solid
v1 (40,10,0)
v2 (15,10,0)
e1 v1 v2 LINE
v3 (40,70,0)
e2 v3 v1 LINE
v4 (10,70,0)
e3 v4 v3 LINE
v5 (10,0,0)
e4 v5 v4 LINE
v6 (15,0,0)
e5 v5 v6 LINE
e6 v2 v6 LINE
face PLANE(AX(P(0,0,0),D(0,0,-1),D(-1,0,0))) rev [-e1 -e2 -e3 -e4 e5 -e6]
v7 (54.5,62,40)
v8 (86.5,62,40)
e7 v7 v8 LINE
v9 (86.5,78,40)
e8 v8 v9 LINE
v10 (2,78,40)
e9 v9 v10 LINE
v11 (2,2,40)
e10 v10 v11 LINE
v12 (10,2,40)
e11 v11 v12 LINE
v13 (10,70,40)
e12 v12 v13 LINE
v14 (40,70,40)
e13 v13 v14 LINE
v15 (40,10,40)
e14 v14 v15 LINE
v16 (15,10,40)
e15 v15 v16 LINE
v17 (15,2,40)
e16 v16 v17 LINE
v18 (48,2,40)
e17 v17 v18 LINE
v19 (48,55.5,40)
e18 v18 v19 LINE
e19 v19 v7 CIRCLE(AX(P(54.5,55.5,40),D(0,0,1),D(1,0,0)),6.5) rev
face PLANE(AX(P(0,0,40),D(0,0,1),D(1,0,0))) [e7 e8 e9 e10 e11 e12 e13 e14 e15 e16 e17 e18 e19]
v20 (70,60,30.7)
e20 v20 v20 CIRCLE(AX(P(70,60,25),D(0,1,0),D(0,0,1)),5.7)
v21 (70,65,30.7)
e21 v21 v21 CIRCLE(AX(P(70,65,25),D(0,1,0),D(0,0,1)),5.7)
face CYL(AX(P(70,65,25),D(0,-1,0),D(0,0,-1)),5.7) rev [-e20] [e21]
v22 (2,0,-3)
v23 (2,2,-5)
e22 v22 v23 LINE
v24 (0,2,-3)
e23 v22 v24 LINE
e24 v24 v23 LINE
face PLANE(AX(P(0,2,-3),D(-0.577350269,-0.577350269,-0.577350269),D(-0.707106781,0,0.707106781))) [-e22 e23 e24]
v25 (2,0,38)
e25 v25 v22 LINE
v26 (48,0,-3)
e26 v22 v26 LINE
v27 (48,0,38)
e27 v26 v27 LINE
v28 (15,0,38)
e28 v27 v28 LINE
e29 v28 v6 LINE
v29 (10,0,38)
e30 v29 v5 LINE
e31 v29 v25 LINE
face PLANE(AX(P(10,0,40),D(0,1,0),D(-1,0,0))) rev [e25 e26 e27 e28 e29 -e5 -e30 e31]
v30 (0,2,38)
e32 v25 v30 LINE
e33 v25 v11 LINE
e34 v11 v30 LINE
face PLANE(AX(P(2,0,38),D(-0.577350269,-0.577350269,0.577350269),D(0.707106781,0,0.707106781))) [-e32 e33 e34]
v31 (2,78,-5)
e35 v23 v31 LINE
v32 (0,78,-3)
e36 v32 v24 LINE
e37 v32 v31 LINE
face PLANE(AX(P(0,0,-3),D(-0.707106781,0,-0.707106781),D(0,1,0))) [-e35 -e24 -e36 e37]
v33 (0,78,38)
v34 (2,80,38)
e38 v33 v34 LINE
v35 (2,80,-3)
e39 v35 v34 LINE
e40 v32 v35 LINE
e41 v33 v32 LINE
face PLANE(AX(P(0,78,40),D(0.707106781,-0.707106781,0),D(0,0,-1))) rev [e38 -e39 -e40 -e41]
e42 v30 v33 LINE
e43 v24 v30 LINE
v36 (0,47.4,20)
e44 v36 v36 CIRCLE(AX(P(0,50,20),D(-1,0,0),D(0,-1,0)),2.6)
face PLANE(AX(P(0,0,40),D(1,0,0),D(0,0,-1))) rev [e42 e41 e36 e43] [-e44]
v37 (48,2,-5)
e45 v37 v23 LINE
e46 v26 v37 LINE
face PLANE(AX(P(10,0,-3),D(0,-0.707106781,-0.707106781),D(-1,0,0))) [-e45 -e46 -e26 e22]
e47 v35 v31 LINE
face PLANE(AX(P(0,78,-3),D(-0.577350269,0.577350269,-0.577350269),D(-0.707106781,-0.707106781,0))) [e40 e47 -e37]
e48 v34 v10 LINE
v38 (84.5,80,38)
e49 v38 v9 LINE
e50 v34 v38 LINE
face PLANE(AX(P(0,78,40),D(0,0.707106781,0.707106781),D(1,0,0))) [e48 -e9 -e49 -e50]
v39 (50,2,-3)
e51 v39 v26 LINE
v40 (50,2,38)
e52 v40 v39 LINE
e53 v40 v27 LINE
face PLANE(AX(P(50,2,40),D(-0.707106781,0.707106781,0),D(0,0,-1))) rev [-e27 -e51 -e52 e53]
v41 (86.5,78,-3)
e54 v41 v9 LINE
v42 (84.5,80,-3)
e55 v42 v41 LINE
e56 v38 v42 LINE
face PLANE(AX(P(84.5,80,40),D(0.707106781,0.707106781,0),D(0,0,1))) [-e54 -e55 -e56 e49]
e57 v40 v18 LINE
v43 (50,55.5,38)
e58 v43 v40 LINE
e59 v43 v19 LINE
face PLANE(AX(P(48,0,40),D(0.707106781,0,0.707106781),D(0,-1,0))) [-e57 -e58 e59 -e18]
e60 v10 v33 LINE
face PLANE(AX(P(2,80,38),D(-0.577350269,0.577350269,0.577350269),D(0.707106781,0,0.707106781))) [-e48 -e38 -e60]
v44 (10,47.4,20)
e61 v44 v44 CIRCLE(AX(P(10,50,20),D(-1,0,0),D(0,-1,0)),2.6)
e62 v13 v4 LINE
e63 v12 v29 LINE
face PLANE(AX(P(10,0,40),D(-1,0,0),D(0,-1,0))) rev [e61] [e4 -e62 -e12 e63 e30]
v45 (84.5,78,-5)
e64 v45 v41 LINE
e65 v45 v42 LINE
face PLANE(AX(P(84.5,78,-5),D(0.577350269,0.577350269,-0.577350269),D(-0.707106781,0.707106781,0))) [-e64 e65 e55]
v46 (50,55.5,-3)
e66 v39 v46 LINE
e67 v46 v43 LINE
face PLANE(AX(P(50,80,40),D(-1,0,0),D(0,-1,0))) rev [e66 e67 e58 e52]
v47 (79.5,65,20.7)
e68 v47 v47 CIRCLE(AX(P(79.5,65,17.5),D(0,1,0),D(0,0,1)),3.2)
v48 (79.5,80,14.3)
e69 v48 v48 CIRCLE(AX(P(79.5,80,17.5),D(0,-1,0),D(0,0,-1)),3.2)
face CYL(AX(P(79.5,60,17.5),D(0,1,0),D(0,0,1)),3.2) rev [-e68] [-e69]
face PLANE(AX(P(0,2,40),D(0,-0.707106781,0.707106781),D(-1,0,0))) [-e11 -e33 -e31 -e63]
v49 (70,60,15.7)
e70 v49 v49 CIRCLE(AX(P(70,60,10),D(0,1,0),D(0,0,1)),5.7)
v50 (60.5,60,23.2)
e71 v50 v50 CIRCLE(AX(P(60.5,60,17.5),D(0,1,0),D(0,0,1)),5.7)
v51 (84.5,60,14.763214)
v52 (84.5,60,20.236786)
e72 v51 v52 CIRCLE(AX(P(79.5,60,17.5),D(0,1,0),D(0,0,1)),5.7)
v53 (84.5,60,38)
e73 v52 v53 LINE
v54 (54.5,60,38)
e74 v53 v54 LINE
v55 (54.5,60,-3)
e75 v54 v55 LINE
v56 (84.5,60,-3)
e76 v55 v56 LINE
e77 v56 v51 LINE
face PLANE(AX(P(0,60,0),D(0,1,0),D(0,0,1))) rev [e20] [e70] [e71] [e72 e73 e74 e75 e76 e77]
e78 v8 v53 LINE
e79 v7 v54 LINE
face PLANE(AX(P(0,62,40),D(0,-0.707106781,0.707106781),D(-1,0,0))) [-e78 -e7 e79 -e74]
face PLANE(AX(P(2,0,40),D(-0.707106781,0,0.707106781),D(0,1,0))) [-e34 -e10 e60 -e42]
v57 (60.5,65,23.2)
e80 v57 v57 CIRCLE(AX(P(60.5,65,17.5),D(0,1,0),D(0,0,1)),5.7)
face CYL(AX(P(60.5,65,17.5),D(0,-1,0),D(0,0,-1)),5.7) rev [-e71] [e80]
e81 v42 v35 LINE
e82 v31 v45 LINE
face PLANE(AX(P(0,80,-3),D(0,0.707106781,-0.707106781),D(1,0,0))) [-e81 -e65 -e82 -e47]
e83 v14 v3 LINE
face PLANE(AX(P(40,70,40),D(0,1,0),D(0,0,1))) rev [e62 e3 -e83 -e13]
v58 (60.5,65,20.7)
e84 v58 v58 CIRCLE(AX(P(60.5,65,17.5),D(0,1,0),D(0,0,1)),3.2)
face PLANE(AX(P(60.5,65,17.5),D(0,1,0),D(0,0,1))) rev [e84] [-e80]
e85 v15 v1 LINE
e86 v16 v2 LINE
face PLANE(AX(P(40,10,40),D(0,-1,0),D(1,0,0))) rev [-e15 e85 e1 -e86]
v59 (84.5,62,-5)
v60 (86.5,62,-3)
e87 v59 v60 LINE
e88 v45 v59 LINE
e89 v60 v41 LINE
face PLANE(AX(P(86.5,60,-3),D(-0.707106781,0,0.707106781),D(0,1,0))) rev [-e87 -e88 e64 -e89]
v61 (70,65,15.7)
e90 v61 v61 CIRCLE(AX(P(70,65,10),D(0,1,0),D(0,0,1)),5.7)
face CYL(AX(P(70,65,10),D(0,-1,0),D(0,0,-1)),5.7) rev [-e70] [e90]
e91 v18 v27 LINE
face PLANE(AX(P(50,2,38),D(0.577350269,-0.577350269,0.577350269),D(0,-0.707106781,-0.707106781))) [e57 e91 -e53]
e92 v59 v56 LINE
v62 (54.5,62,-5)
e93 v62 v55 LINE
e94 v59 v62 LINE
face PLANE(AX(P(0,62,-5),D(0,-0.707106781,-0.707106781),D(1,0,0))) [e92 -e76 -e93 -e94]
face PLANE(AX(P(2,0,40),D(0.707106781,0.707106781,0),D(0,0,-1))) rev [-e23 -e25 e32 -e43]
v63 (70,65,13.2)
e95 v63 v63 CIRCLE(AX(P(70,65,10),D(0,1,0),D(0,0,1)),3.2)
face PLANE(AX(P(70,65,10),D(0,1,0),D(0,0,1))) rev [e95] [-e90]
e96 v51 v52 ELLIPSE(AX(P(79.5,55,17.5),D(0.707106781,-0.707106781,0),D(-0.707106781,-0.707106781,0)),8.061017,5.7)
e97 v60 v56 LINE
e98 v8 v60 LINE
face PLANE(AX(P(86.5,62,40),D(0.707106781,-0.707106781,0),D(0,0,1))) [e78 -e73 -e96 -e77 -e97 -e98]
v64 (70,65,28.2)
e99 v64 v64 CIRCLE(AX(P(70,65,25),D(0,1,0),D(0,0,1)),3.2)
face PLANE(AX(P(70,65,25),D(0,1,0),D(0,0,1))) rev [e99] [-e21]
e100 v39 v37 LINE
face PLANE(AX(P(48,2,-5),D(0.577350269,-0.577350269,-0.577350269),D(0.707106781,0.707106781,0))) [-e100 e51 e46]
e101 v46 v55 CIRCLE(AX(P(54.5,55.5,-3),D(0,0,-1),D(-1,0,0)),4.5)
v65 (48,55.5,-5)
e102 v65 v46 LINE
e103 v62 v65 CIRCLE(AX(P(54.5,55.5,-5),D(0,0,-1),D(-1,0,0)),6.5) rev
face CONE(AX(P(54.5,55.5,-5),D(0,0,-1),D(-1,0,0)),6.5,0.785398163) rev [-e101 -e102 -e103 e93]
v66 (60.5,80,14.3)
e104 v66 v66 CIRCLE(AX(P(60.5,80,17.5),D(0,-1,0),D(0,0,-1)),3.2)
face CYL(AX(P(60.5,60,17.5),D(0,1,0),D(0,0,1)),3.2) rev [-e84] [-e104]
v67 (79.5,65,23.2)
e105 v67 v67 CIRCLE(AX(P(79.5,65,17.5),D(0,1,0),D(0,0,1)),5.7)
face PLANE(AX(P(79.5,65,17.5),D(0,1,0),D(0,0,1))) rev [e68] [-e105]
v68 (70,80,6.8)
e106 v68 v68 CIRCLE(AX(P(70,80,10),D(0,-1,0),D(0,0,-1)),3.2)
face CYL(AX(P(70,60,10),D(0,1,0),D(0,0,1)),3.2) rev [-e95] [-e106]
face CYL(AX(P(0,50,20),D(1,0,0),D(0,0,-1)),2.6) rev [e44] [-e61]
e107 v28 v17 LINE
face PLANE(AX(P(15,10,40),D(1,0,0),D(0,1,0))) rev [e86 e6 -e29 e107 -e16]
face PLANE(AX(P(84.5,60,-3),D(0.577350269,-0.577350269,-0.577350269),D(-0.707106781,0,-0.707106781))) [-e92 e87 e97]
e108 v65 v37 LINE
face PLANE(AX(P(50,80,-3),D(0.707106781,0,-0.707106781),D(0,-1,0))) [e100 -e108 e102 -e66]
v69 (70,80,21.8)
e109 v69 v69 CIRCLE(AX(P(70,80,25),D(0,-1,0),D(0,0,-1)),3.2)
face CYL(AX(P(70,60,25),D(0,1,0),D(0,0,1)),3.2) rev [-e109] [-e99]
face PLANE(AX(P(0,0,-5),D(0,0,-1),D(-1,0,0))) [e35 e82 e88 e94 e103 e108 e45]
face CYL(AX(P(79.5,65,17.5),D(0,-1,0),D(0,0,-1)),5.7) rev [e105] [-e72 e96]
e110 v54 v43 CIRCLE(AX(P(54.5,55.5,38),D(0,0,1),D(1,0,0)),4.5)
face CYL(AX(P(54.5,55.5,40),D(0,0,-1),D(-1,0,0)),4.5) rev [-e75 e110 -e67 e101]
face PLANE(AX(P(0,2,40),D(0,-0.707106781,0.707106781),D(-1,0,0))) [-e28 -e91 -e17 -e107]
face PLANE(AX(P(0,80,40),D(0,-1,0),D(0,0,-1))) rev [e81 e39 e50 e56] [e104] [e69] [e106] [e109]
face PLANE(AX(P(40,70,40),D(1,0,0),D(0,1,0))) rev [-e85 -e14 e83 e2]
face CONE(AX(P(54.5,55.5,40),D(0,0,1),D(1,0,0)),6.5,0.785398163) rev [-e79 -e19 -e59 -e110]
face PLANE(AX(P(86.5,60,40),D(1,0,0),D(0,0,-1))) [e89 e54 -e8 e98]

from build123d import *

# Parameters (mm, degrees)
BOSS_EXTRUDE1_DEPTH = 40
CUT_EXTRUDE1_START  = 10
SKETCH2_R           = 2.6
CUT_EXTRUDE1_DEPTH  = 113.46950766
SKETCH9_W           = 50
SKETCH9_H           = 80
BOSS_EXTRUDE2_DEPTH = 5
BOSS_EXTRUDE4_START = 80
SKETCH11_W          = 36.5
SKETCH11_H          = 45
SKETCH11_R          = 3.2
BOSS_EXTRUDE4_DEPTH = 20
CUT_EXTRUDE11_START = 60
SKETCH12_R          = 5.7
CUT_EXTRUDE11_DEPTH = 5
FILLET1_R           = 4.5


with BuildPart() as part:
    # Sketch1 → Boss-Extrude1 (new body)
    with BuildSketch(Plane.XY):
        Polygon((10, 0), (0, 0), (0, 80), (50, 80), (50, 0), (15, 0), (15, 10), (40, 10), (40, 70), (10, 70), align=None)
    extrude(amount=BOSS_EXTRUDE1_DEPTH)

    # Sketch2 → Cut-Extrude1 (cut, through all)
    with BuildSketch(Plane(origin=(0, 0, 0), x_dir=(0, 0, -1), z_dir=(1, 0, 0)).offset(CUT_EXTRUDE1_START)):
        with Locations(Location((-20, 50, 0), (0, 0, 270))):
            Circle(SKETCH2_R)
    extrude(amount=-CUT_EXTRUDE1_DEPTH, mode=Mode.SUBTRACT)

    # Sketch9 → Boss-Extrude2 (add)
    with BuildSketch(Plane.XY):
        with Locations((25, 40)):
            Rectangle(SKETCH9_W, SKETCH9_H)
    extrude(amount=-BOSS_EXTRUDE2_DEPTH)

    # Sketch11 → Boss-Extrude4 (add)
    with BuildSketch(Plane(origin=(0, 0, 0), x_dir=(1, 0, 0), z_dir=(0, 1, 0)).offset(BOSS_EXTRUDE4_START)):
        with Locations((68.25, -17.5)):
            Rectangle(SKETCH11_W, SKETCH11_H)
        with Locations(Location((60.5, -17.5, 0), (0, 0, 90))):
            Circle(SKETCH11_R, mode=Mode.SUBTRACT)
        with Locations(Location((70, -10, 0), (0, 0, 90))):
            Circle(SKETCH11_R, mode=Mode.SUBTRACT)
        with Locations(Location((79.5, -17.5, 0), (0, 0, 90))):
            Circle(SKETCH11_R, mode=Mode.SUBTRACT)
        with Locations(Location((70, -25, 0), (0, 0, 90))):
            Circle(SKETCH11_R, mode=Mode.SUBTRACT)
    extrude(amount=-BOSS_EXTRUDE4_DEPTH)

    # Sketch12 → Cut-Extrude11 (cut)
    with BuildSketch(Plane(origin=(0, 0, 0), x_dir=(1, 0, 0), z_dir=(0, 1, 0)).offset(CUT_EXTRUDE11_START)):
        with Locations(Location((70, -10, 0), (0, 0, 270))):
            Circle(SKETCH12_R)
        with Locations(Location((79.5, -17.5, 0), (0, 0, 270))):
            Circle(SKETCH12_R)
        with Locations(Location((70, -25, 0), (0, 0, 270))):
            Circle(SKETCH12_R)
        with Locations(Location((60.5, -17.5, 0), (0, 0, 270))):
            Circle(SKETCH12_R)
    extrude(amount=CUT_EXTRUDE11_DEPTH, mode=Mode.SUBTRACT)

    # Fillet1
    fillet1_edges = [part.edges().sort_by_distance(p)[0] for p in [
        (50, 60, 17.5),
    ]]
    fillet(fillet1_edges, radius=FILLET1_R)

    # Chamfer1
    # the kernel refuses this chamfer: 2 mm, written as the material it takes off along each edge
    with BuildSketch(Plane(origin=(1.333333333, 1.333333333, 38.666666667), x_dir=(0, -0.7071067811865475, -0.7071067811865475), z_dir=(-0.5773502691896347, -0.5773502691896213, 0.5773502691896212)), Plane(origin=(1.333333333, 78.666666667, -3.666666667), x_dir=(0, 0.7071067811865475, 0.7071067811865475), z_dir=(-0.5773502691896258, 0.5773502691896258, -0.5773502691896258)), Plane(origin=(48.666666667, 1.333333333, -3.666666667), x_dir=(-0.7071067811865475, 0, -0.7071067811865475), z_dir=(0.5773502691897349, -0.5773502691894069, -0.5773502691897356)), Plane(origin=(48.666666667, 1.333333333, 38.666666667), x_dir=(0.7071067811865464, 0, -0.7071067811865488), z_dir=(0.5773502691897359, -0.5773502691894074, 0.577350269189734)), Plane(origin=(85.166666667, 78.666666667, -3.666666667), x_dir=(0.7071067811865477, 0, 0.7071067811865474), z_dir=(0.5773502691896257, 0.5773502691896257, -0.577350269189626)), Plane(origin=(85.166666667, 61.333333333, -3.666666667), x_dir=(0.7071067811865475, 0.7071067811865475, 0), z_dir=(0.5773502691896256, -0.5773502691896257, -0.5773502691896258))) as chamfer1_piece_1:
        Polygon((-1.414213562, 0.816496581), (1.414213562, 0.816496581), (0, -1.632993162), align=None)
    extrude(amount=2.540341184, mode=Mode.SUBTRACT)
    with BuildSketch(Plane(origin=(1.333333333, 1.333333333, -3.666666667), x_dir=(0, -0.7071067811865558, 0.7071067811865391), z_dir=(-0.5773502691896303, -0.5773502691896167, -0.5773502691896303)), Plane(origin=(1.333333333, 78.666666667, 38.666666667), x_dir=(0, 0.7071067811865475, -0.7071067811865475), z_dir=(-0.5773502691896258, 0.5773502691896258, 0.5773502691896258))) as chamfer1_piece_2:
        Polygon((-1.414213562, -0.816496581), (1.414213562, -0.816496581), (0, 1.632993162), align=None)
    extrude(amount=2.540341184, mode=Mode.SUBTRACT)
    with BuildSketch(Plane(origin=(0, 0, 45.143365976), x_dir=(0.9996219169112961, -0.027495876610609604, 0), z_dir=(0, 0, -1)), Plane(origin=(86.5, 80, -10.143365976), x_dir=(0.027495876610589005, -0.9996219169112968, 0), z_dir=(0, 0, 1)), Plane(origin=(86.5, 60, -10.143365976), x_dir=(-0.9996219169112968, -0.02749587661058555, 0), z_dir=(0, 0, 1))) as chamfer1_piece_3:
        with BuildLine():
            Line((2.05734639, 0), (-0.11309431, -2.054235587))
            Line((-0.11309431, -2.054235587), (-0.153079186, -2.053135752))
            ThreePointArc((-0.153079186, -2.053135752), (-0.068258454, -1.026795659), (-0.039984877, 0.001099835))
            Line((-0.039984877, 0.001099835), (0.001099835, 0.039984877))
            ThreePointArc((0.001099835, 0.039984877), (1.028995329, 0.011711299), (2.058446225, 0.039984877))
            Line((2.058446225, 0.039984877), (2.05734639, 0))
        make_face()
    extrude(amount=55.286731952, mode=Mode.SUBTRACT)
    with BuildSketch(Plane(origin=(0, 80, 45.143365976), x_dir=(0.9996219169112968, 0.02749587661058908, 0), z_dir=(0, 0, -1)), Plane(origin=(50, 0, -10.143365976), x_dir=(0.027495876610585633, 0.9996219169112968, 0), z_dir=(0, 0, 1))) as chamfer1_piece_4:
        with BuildLine():
            Line((2.05734639, 0), (-0.11309431, 2.054235587))
            Line((-0.11309431, 2.054235587), (-0.153079186, 2.053135752))
            ThreePointArc((-0.153079186, 2.053135752), (-0.068258454, 1.026795659), (-0.039984877, -0.001099835))
            Line((-0.039984877, -0.001099835), (0.001099835, -0.039984877))
            ThreePointArc((0.001099835, -0.039984877), (1.028995329, -0.011711299), (2.058446225, -0.039984877))
            Line((2.058446225, -0.039984877), (2.05734639, 0))
        make_face()
    extrude(amount=55.286731952, mode=Mode.SUBTRACT)
    with BuildSketch(Plane(origin=(55.143365976, 0, 40), x_dir=(0, 0.9996219169112968, 0.02749587661058563), z_dir=(-1, 0, 0))) as chamfer1_piece_5:
        with BuildLine():
            Line((2.05734639, 0), (-0.11309431, 2.054235587))
            Line((-0.11309431, 2.054235587), (-0.153079186, 2.053135752))
            ThreePointArc((-0.153079186, 2.053135752), (-0.068258454, 1.026795659), (-0.039984877, -0.001099835))
            Line((-0.039984877, -0.001099835), (0.001099835, -0.039984877))
            ThreePointArc((0.001099835, -0.039984877), (1.028995329, -0.011711299), (2.058446225, -0.039984877))
            Line((2.058446225, -0.039984877), (2.05734639, 0))
        make_face()
    extrude(amount=45.286731952, mode=Mode.SUBTRACT)
    with BuildSketch(Plane(origin=(50, 55.5, 40), x_dir=(-0.9996219169112968, 0, 0.027495876610585647), z_dir=(0, -1, 0))) as chamfer1_piece_6:
        with BuildLine():
            Line((2.05734639, 0), (-0.11309431, 2.054235587))
            Line((-0.11309431, 2.054235587), (-0.153079186, 2.053135752))
            ThreePointArc((-0.153079186, 2.053135752), (-0.068258454, 1.026795659), (-0.039984877, -0.001099835))
            Line((-0.039984877, -0.001099835), (0.001099835, -0.039984877))
            ThreePointArc((0.001099835, -0.039984877), (1.028995329, -0.011711299), (2.058446225, -0.039984877))
            Line((2.058446225, -0.039984877), (2.05734639, 0))
        make_face()
    extrude(amount=60.643365976, mode=Mode.SUBTRACT)
    with BuildSketch(Plane(origin=(91.643365976, 80, 40), x_dir=(0, -0.9996219169112968, 0.02749587661058555), z_dir=(-1, 0, 0))) as chamfer1_piece_7:
        with BuildLine():
            Line((2.05734639, 0), (-0.11309431, -2.054235587))
            Line((-0.11309431, -2.054235587), (-0.153079186, -2.053135752))
            ThreePointArc((-0.153079186, -2.053135752), (-0.068258454, -1.026795659), (-0.039984877, 0.001099835))
            Line((-0.039984877, 0.001099835), (0.001099835, 0.039984877))
            ThreePointArc((0.001099835, 0.039984877), (1.028995329, 0.011711299), (2.058446225, 0.039984877))
            Line((2.058446225, 0.039984877), (2.05734639, 0))
        make_face()
    extrude(amount=96.786731952, mode=Mode.SUBTRACT)
    with BuildSketch(Plane(origin=(50, -5.143365976, -5), x_dir=(0.02749587661058563, 0, 0.9996219169112968), z_dir=(0, 1, 0))) as chamfer1_piece_8:
        with BuildLine():
            Line((2.05734639, 0), (-0.11309431, -2.054235587))
            Line((-0.11309431, -2.054235587), (-0.153079186, -2.053135752))
            ThreePointArc((-0.153079186, -2.053135752), (-0.068258454, -1.026795659), (-0.039984877, 0.001099835))
            Line((-0.039984877, 0.001099835), (0.001099835, 0.039984877))
            ThreePointArc((0.001099835, 0.039984877), (1.028995329, 0.011711299), (2.058446225, 0.039984877))
            Line((2.058446225, 0.039984877), (2.05734639, 0))
        make_face()
    extrude(amount=60.643365976, mode=Mode.SUBTRACT)
    with BuildSketch(Plane(origin=(-5.143365976, 0, -5), x_dir=(0, -0.027495876610586372, 0.9996219169112968), z_dir=(1, 0, 0))) as chamfer1_piece_9:
        with BuildLine():
            Line((2.05734639, 0), (-0.11309431, -2.054235587))
            Line((-0.11309431, -2.054235587), (-0.153079186, -2.053135752))
            ThreePointArc((-0.153079186, -2.053135752), (-0.068258454, -1.026795659), (-0.039984877, 0.001099835))
            Line((-0.039984877, 0.001099835), (0.001099835, 0.039984877))
            ThreePointArc((0.001099835, 0.039984877), (1.028995329, 0.011711299), (2.058446225, 0.039984877))
            Line((2.058446225, 0.039984877), (2.05734639, 0))
        make_face()
    extrude(amount=60.286731952, mode=Mode.SUBTRACT)
    with BuildSketch(Plane(origin=(0, 85.143365976, -5), x_dir=(-0.027495876610586372, 0, 0.9996219169112968), z_dir=(0, -1, 0))) as chamfer1_piece_10:
        with BuildLine():
            Line((2.05734639, 0), (-0.11309431, -2.054235587))
            Line((-0.11309431, -2.054235587), (-0.153079186, -2.053135752))
            ThreePointArc((-0.153079186, -2.053135752), (-0.068258454, -1.026795659), (-0.039984877, 0.001099835))
            Line((-0.039984877, 0.001099835), (0.001099835, 0.039984877))
            ThreePointArc((0.001099835, 0.039984877), (1.028995329, 0.011711299), (2.058446225, 0.039984877))
            Line((2.058446225, 0.039984877), (2.05734639, 0))
        make_face()
    extrude(amount=90.286731952, mode=Mode.SUBTRACT)
    with BuildSketch(Plane(origin=(0, -5.143365976, 40), x_dir=(0.9996219169112968, 0, 0.02749587661058563), z_dir=(0, 1, 0))) as chamfer1_piece_11:
        with BuildLine():
            Line((2.05734639, 0), (-0.11309431, 2.054235587))
            Line((-0.11309431, 2.054235587), (-0.153079186, 2.053135752))
            ThreePointArc((-0.153079186, 2.053135752), (-0.068258454, 1.026795659), (-0.039984877, -0.001099835))
            Line((-0.039984877, -0.001099835), (0.001099835, -0.039984877))
            ThreePointArc((0.001099835, -0.039984877), (1.028995329, -0.011711299), (2.058446225, -0.039984877))
            Line((2.058446225, -0.039984877), (2.05734639, 0))
        make_face()
    extrude(amount=90.286731952, mode=Mode.SUBTRACT)
    with BuildSketch(Plane(origin=(-5.143365976, 80, -5), x_dir=(0, 0.02749587661058908, 0.9996219169112968), z_dir=(1, 0, 0))) as chamfer1_piece_12:
        with BuildLine():
            Line((2.05734639, 0), (-0.11309431, 2.054235587))
            Line((-0.11309431, 2.054235587), (-0.153079186, 2.053135752))
            ThreePointArc((-0.153079186, 2.053135752), (-0.068258454, 1.026795659), (-0.039984877, -0.001099835))
            Line((-0.039984877, -0.001099835), (0.001099835, -0.039984877))
            ThreePointArc((0.001099835, -0.039984877), (1.028995329, -0.011711299), (2.058446225, -0.039984877))
            Line((2.058446225, -0.039984877), (2.05734639, 0))
        make_face()
    extrude(amount=96.786731952, mode=Mode.SUBTRACT)
    with BuildSketch(Plane(origin=(15.143365976, 0, 40), x_dir=(2.3568108242796768e-14, 0.9996219169112968, 0.027495876610585623), z_dir=(-1, 0, 0))) as chamfer1_piece_13:
        with BuildLine():
            Line((2.05734639, 0), (-0.11309431, 2.054235587))
            Line((-0.11309431, 2.054235587), (-0.153079186, 2.053135752))
            ThreePointArc((-0.153079186, 2.053135752), (-0.068258454, 1.026795659), (-0.039984877, -0.001099835))
            Line((-0.039984877, -0.001099835), (0.001099835, -0.039984877))
            ThreePointArc((0.001099835, -0.039984877), (1.028995329, -0.011711299), (2.058446225, -0.039984877))
            Line((2.058446225, -0.039984877), (2.05734639, 0))
        make_face()
    extrude(amount=20.286731952, mode=Mode.SUBTRACT)
    with BuildSketch(Plane(origin=(54.5, 60, -5), x_dir=(0, -0.027495876610585616, 0.9996219169112968), z_dir=(1, 0, 0))) as chamfer1_piece_14:
        with BuildLine():
            Line((2.05734639, 0), (-0.11309431, -2.054235587))
            Line((-0.11309431, -2.054235587), (-0.153079186, -2.053135752))
            ThreePointArc((-0.153079186, -2.053135752), (-0.068258454, -1.026795659), (-0.039984877, 0.001099835))
            Line((-0.039984877, 0.001099835), (0.001099835, 0.039984877))
            ThreePointArc((0.001099835, 0.039984877), (1.028995329, 0.011711299), (2.058446225, 0.039984877))
            Line((2.058446225, 0.039984877), (2.05734639, 0))
        make_face()
    extrude(amount=37.143365976, mode=Mode.SUBTRACT)
    with BuildSketch(Plane(origin=(86.5, 85.143365976, -5), x_dir=(0.02749587661058908, 0, 0.9996219169112968), z_dir=(0, -1, 0))) as chamfer1_piece_15:
        with BuildLine():
            Line((2.05734639, 0), (-0.11309431, 2.054235587))
            Line((-0.11309431, 2.054235587), (-0.153079186, 2.053135752))
            ThreePointArc((-0.153079186, 2.053135752), (-0.068258454, 1.026795659), (-0.039984877, -0.001099835))
            Line((-0.039984877, -0.001099835), (0.001099835, -0.039984877))
            ThreePointArc((0.001099835, -0.039984877), (1.028995329, -0.011711299), (2.058446225, -0.039984877))
            Line((2.058446225, -0.039984877), (2.05734639, 0))
        make_face()
    extrude(amount=30.286731952, mode=Mode.SUBTRACT)
    with BuildSketch(Plane(origin=(91.643365976, 60, 40), x_dir=(0, 0.9996219169112968, 0.027495876610585647), z_dir=(-1, 0, 0))) as chamfer1_piece_16:
        with BuildLine():
            Line((2.05734639, 0), (-0.11309431, 2.054235587))
            Line((-0.11309431, 2.054235587), (-0.153079186, 2.053135752))
            ThreePointArc((-0.153079186, 2.053135752), (-0.068258454, 1.026795659), (-0.039984877, -0.001099835))
            Line((-0.039984877, -0.001099835), (0.001099835, -0.039984877))
            ThreePointArc((0.001099835, -0.039984877), (1.028995329, -0.011711299), (2.058446225, -0.039984877))
            Line((2.058446225, -0.039984877), (2.05734639, 0))
        make_face()
    extrude(amount=37.143365976, mode=Mode.SUBTRACT)
    with BuildSketch(Plane(origin=(54.5, 55.5, 40), x_dir=(-1, 0, 0), z_dir=(0, -1, 0))) as chamfer1_piece_17:
        with BuildLine():
            Line((6.556568542, -0.056568542), (4.443431458, 2.056568542))
            Line((4.443431458, 2.056568542), (4.403431458, 2.056568542))
            ThreePointArc((4.403431458, 2.056568542), (4.46, 1.028284271), (4.46, 0))
            Line((4.46, 0), (4.5, -0.04))
            ThreePointArc((4.5, -0.04), (5.528284271, -0.04), (6.556568542, -0.096568542))
            Line((6.556568542, -0.096568542), (6.556568542, -0.056568542))
        make_face()
    revolve(axis=Axis((54.5, 55.5, 40), (0, 0, -1)), revolution_arc=90, mode=Mode.SUBTRACT)
    with BuildSketch(Plane(origin=(54.5, 55.5, -5), x_dir=(-1, 0, 0), z_dir=(0, -1, 0))) as chamfer1_piece_18:
        with BuildLine():
            Line((4.443431458, -2.056568542), (6.556568542, 0.056568542))
            Line((6.556568542, 0.056568542), (6.556568542, 0.096568542))
            ThreePointArc((6.556568542, 0.096568542), (5.528284271, 0.04), (4.5, 0.04))
            Line((4.5, 0.04), (4.46, 0))
            ThreePointArc((4.46, 0), (4.46, -1.028284271), (4.403431458, -2.056568542))
            Line((4.403431458, -2.056568542), (4.443431458, -2.056568542))
        make_face()
    revolve(axis=Axis((54.5, 55.5, -5), (0, 0, -1)), revolution_arc=90, mode=Mode.SUBTRACT)


solid = part.part
